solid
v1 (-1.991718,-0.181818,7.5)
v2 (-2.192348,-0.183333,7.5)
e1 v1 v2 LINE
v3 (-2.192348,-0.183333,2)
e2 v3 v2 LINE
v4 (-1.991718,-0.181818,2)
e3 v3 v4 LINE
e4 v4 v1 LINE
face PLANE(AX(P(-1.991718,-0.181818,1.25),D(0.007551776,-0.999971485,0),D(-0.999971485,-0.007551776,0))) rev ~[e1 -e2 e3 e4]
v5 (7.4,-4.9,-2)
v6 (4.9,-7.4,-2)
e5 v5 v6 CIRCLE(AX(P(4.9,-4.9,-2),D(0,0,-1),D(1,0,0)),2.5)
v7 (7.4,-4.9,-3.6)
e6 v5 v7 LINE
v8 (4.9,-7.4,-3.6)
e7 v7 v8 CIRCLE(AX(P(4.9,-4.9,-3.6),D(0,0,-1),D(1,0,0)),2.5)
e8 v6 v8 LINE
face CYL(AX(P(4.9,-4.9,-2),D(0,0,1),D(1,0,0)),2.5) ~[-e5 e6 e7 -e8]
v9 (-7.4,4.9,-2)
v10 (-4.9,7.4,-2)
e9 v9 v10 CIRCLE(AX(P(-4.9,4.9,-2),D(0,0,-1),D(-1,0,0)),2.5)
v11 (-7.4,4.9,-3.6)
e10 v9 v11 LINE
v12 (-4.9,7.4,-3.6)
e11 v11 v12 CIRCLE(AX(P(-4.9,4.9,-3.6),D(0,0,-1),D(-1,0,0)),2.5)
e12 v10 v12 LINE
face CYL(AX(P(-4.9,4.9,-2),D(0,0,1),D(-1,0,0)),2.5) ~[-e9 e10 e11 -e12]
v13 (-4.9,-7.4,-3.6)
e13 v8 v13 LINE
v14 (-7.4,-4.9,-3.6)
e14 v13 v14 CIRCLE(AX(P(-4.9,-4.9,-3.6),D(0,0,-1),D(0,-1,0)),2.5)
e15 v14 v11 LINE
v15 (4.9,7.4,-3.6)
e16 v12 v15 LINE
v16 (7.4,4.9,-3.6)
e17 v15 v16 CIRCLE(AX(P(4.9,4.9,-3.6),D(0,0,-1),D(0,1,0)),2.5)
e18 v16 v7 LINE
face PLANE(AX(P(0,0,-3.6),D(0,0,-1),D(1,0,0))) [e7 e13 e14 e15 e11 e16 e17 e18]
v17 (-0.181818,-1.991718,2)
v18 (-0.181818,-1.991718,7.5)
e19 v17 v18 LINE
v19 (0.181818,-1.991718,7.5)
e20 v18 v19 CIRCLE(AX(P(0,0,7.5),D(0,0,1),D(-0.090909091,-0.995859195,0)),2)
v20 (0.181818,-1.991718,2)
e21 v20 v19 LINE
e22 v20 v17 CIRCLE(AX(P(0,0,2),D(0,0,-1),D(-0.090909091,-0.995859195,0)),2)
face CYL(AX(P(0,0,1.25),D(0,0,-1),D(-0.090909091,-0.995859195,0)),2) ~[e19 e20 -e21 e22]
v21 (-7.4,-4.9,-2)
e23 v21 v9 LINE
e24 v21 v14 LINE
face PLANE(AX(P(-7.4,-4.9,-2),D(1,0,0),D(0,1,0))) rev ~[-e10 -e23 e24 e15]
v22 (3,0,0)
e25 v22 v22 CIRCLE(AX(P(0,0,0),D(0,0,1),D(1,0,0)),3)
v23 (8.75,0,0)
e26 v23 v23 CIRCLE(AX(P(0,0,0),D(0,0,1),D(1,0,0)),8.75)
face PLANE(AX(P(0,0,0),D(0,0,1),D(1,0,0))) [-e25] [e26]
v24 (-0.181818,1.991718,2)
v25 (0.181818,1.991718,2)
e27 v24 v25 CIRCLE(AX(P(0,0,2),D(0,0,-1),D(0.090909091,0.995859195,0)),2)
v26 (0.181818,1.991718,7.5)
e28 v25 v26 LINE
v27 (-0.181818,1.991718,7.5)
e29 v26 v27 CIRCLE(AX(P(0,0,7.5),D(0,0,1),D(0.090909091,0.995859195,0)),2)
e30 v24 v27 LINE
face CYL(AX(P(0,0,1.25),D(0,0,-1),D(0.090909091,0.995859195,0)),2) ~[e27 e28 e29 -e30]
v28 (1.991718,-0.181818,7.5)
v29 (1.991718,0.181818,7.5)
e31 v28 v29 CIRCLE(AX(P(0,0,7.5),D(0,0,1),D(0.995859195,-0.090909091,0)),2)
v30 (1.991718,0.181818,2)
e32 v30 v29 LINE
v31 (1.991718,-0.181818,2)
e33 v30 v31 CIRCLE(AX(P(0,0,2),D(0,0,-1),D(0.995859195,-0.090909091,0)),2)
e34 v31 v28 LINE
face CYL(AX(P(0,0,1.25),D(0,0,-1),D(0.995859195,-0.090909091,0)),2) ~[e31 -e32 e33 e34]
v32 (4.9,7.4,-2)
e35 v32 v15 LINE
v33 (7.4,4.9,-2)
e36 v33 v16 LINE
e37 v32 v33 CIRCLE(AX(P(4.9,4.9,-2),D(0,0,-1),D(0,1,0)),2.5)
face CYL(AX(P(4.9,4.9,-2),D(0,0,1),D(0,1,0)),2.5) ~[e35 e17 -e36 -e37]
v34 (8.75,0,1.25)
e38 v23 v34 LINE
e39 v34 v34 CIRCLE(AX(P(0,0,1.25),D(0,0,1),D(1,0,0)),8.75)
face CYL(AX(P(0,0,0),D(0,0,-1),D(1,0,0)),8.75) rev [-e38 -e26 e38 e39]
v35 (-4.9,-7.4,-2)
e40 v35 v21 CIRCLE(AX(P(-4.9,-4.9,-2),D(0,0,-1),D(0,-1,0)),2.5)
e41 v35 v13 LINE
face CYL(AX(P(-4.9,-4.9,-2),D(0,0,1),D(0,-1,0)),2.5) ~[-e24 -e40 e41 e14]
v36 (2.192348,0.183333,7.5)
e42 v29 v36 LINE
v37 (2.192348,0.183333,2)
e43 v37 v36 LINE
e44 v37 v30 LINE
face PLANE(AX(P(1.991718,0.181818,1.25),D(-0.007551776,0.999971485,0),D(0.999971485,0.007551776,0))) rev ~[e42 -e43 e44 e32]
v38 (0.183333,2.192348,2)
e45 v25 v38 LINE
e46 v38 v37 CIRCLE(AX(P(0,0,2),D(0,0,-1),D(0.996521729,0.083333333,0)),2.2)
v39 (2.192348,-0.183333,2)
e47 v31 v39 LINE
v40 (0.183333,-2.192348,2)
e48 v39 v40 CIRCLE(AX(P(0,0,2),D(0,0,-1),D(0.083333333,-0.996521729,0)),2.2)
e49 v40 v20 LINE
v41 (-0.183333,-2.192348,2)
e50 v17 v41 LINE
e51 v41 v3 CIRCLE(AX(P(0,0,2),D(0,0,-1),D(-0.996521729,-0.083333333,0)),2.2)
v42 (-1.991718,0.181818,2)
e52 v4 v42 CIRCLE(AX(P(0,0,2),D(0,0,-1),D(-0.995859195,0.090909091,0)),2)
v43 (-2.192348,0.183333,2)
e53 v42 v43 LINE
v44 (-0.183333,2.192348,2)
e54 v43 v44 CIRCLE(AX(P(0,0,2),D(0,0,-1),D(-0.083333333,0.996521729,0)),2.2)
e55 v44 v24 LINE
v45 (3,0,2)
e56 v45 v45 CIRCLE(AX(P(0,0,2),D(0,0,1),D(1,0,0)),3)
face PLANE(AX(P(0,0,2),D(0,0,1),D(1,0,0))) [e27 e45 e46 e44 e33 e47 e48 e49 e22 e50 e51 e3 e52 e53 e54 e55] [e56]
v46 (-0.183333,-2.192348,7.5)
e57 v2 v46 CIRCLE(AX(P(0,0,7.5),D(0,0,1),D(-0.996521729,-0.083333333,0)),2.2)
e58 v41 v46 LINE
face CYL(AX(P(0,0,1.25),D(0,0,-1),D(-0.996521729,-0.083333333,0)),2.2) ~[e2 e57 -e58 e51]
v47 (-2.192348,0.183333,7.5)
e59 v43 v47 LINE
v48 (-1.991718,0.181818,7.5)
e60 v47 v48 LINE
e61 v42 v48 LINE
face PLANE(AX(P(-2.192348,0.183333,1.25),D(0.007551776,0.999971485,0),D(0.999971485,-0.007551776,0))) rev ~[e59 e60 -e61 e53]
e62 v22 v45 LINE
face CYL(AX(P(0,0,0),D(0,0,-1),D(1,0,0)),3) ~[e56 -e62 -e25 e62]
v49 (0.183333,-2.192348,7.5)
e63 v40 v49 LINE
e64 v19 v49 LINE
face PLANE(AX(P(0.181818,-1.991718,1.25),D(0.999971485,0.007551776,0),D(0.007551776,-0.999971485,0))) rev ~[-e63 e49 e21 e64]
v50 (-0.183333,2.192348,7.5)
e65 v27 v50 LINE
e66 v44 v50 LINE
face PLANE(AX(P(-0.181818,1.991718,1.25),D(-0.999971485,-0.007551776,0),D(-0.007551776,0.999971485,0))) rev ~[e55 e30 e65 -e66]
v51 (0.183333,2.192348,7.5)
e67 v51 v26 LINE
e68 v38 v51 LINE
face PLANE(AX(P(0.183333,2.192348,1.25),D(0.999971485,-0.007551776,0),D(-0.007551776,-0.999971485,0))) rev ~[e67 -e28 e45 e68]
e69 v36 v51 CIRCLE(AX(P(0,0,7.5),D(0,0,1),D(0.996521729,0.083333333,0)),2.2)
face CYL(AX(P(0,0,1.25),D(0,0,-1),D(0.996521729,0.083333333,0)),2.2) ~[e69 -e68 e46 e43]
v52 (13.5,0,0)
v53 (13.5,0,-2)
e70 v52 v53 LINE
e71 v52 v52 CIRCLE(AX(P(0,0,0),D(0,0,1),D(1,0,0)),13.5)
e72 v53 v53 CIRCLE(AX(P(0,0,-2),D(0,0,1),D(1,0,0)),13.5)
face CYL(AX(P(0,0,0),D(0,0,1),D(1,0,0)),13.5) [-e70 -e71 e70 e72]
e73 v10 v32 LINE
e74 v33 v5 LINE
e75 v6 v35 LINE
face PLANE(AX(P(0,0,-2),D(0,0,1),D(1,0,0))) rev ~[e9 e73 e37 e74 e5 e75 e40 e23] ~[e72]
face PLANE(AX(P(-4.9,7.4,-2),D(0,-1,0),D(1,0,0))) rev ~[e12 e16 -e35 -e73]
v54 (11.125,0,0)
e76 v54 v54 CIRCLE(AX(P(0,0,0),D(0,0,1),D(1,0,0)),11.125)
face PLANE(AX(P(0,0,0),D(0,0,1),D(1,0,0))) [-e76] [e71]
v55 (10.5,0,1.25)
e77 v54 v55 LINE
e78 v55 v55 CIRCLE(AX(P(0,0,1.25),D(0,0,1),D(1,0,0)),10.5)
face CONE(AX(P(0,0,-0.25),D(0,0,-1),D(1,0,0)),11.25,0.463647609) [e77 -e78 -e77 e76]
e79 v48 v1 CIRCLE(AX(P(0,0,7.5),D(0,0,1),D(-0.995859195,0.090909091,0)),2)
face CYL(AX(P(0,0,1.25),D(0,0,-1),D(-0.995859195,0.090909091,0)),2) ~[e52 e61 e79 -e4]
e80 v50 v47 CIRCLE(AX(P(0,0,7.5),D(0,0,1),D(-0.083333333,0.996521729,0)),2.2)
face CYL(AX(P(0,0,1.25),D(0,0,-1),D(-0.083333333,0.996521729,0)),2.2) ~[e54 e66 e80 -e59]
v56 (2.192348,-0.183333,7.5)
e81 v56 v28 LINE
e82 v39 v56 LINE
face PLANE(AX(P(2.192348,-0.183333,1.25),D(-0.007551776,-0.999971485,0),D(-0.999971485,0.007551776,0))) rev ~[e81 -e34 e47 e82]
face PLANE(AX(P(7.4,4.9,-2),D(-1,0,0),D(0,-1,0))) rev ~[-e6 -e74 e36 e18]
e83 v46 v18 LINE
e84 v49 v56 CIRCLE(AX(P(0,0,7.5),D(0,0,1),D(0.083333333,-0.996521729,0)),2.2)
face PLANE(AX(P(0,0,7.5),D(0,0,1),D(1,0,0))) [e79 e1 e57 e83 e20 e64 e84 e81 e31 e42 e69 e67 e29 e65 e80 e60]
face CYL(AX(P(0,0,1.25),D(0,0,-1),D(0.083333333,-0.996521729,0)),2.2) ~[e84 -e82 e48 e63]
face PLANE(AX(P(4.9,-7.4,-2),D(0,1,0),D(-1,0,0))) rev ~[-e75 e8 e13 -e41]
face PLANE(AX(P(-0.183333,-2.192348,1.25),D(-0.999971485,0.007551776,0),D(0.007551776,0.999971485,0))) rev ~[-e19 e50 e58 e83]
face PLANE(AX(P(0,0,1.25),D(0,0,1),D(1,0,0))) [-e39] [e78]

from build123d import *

# Parameters (mm, degrees)
F0_R      = 13.5
F0_R_2    = 11.25
F0_R_3    = 10.5
F0_R_4    = 8.75
F0_R_5    = 3
F0_R_6    = 2.2
F1_DEPTH  = 2
F4_DEPTH  = 1.25
F6_DEPTH  = 2
F7_DEPTH  = 2
F8_DEPTH  = 6.25
F11_DEPTH = 1.6


# Not quite as in the source:
# - a fillet or chamfer that OpenCascade refuses, or shapes differently, is made with other operations: its cross-section is extruded or revolved along the edge and cut away or added


with BuildPart() as f1:
    # F0 (on Top) → F1 (new body)
    with BuildSketch(Plane.XY):
        Circle(F0_R)
        Circle(F0_R_2, mode=Mode.SUBTRACT)
        Circle(F0_R_2)
        Circle(F0_R_3, mode=Mode.SUBTRACT)
        Circle(F0_R_3)
        Circle(F0_R_4, mode=Mode.SUBTRACT)
        Circle(F0_R_4)
        Circle(F0_R_5, mode=Mode.SUBTRACT)
        Circle(F0_R_5)
        Circle(F0_R_6, mode=Mode.SUBTRACT)
        Circle(F0_R_6)
    extrude(amount=-F1_DEPTH)

    # F0 (on Top) → F4 (join)
    with BuildSketch(Plane.XY):
        Circle(F0_R_2)
        Circle(F0_R_3, mode=Mode.SUBTRACT)
        Circle(F0_R_3)
        Circle(F0_R_4, mode=Mode.SUBTRACT)
    extrude(amount=F4_DEPTH)

    # F5: chamfer of 1.5 x 0.75 on 1 edges, made by hand


with BuildPart() as f5_tool2:
    # F5_s3 → F5_t4 (revolve)
    with BuildSketch(Plane.XZ):
        Polygon((11.25, -0.25), (10.5, 1.25), (11.25, 1.25), align=None)
    revolve(axis=Axis((0, 0, 1.25), (0, 0, 1)))

    split(bisect_by=Plane.XY, keep=Keep.TOP)


with BuildPart() as f1_1:
    add(f1.part)

    # F5_t1: cut F5_tool2
    add(f5_tool2.part, mode=Mode.SUBTRACT)

    # F0 (on Top) → F6 (join)
    with BuildSketch(Plane.XY):
        Circle(F0_R_5)
        Circle(F0_R_6, mode=Mode.SUBTRACT)
    extrude(amount=F6_DEPTH)

    # F0 (on Top) → F7 (join)
    with BuildSketch(Plane.XY):
        Circle(F0_R_6)
    extrude(amount=F7_DEPTH)

    # F3 (on offset) → F8 (join)
    with BuildSketch(Plane.XY.offset(1.25)):
        with BuildLine():
            Line((-0.1818181818, 1.9917183909), (-0.1833333333, 2.1923478029))
            ThreePointArc((-0.1833333333, 2.1923478029), (-1.5556349186, 1.5556349186), (-2.1923478029, 0.1833333333))
            Line((-2.1923478029, 0.1833333333), (-1.9917183909, 0.1818181818))
            ThreePointArc((-1.9917183909, 0.1818181818), (-2, 0), (-1.9917183909, -0.1818181818))
            Line((-1.9917183909, -0.1818181818), (-2.1923478029, -0.1833333333))
            ThreePointArc((-2.1923478029, -0.1833333333), (-1.5556349186, -1.5556349186), (-0.1833333333, -2.1923478029))
            Line((-0.1833333333, -2.1923478029), (-0.1818181818, -1.9917183909))
            ThreePointArc((-0.1818181818, -1.9917183909), (0, -2), (0.1818181818, -1.9917183909))
            Line((0.1818181818, -1.9917183909), (0.1833333333, -2.1923478029))
            ThreePointArc((0.1833333333, -2.1923478029), (1.5556349186, -1.5556349186), (2.1923478029, -0.1833333333))
            Line((2.1923478029, -0.1833333333), (1.9917183909, -0.1818181818))
            ThreePointArc((1.9917183909, -0.1818181818), (2, 0), (1.9917183909, 0.1818181818))
            Line((1.9917183909, 0.1818181818), (2.1923478029, 0.1833333333))
            ThreePointArc((2.1923478029, 0.1833333333), (1.5556349186, 1.5556349186), (0.1833333333, 2.1923478029))
            Line((0.1833333333, 2.1923478029), (0.1818181818, 1.9917183909))
            ThreePointArc((0.1818181818, 1.9917183909), (0, 2), (-0.1818181818, 1.9917183909))
        make_face()
    extrude(amount=F8_DEPTH)

    # F10 (on offset) → F11 (join)
    with BuildSketch(Plane(origin=(0, 0, -2), x_dir=(1, 0, 0), z_dir=(0, 0, -1))):
        with BuildLine():
            Line((-4.9, -7.4), (4.9, -7.4))
            ThreePointArc((4.9, -7.4), (6.667766953, -6.667766953), (7.4, -4.9))
            Line((7.4, -4.9), (7.4, 4.9))
            ThreePointArc((7.4, 4.9), (6.667766953, 6.667766953), (4.9, 7.4))
            Line((4.9, 7.4), (-4.9, 7.4))
            ThreePointArc((-4.9, 7.4), (-6.667766953, 6.667766953), (-7.4, 4.9))
            Line((-7.4, 4.9), (-7.4, -4.9))
            ThreePointArc((-7.4, -4.9), (-6.667766953, -6.667766953), (-4.9, -7.4))
        make_face()
    extrude(amount=F11_DEPTH)


solid = f1_1.part
